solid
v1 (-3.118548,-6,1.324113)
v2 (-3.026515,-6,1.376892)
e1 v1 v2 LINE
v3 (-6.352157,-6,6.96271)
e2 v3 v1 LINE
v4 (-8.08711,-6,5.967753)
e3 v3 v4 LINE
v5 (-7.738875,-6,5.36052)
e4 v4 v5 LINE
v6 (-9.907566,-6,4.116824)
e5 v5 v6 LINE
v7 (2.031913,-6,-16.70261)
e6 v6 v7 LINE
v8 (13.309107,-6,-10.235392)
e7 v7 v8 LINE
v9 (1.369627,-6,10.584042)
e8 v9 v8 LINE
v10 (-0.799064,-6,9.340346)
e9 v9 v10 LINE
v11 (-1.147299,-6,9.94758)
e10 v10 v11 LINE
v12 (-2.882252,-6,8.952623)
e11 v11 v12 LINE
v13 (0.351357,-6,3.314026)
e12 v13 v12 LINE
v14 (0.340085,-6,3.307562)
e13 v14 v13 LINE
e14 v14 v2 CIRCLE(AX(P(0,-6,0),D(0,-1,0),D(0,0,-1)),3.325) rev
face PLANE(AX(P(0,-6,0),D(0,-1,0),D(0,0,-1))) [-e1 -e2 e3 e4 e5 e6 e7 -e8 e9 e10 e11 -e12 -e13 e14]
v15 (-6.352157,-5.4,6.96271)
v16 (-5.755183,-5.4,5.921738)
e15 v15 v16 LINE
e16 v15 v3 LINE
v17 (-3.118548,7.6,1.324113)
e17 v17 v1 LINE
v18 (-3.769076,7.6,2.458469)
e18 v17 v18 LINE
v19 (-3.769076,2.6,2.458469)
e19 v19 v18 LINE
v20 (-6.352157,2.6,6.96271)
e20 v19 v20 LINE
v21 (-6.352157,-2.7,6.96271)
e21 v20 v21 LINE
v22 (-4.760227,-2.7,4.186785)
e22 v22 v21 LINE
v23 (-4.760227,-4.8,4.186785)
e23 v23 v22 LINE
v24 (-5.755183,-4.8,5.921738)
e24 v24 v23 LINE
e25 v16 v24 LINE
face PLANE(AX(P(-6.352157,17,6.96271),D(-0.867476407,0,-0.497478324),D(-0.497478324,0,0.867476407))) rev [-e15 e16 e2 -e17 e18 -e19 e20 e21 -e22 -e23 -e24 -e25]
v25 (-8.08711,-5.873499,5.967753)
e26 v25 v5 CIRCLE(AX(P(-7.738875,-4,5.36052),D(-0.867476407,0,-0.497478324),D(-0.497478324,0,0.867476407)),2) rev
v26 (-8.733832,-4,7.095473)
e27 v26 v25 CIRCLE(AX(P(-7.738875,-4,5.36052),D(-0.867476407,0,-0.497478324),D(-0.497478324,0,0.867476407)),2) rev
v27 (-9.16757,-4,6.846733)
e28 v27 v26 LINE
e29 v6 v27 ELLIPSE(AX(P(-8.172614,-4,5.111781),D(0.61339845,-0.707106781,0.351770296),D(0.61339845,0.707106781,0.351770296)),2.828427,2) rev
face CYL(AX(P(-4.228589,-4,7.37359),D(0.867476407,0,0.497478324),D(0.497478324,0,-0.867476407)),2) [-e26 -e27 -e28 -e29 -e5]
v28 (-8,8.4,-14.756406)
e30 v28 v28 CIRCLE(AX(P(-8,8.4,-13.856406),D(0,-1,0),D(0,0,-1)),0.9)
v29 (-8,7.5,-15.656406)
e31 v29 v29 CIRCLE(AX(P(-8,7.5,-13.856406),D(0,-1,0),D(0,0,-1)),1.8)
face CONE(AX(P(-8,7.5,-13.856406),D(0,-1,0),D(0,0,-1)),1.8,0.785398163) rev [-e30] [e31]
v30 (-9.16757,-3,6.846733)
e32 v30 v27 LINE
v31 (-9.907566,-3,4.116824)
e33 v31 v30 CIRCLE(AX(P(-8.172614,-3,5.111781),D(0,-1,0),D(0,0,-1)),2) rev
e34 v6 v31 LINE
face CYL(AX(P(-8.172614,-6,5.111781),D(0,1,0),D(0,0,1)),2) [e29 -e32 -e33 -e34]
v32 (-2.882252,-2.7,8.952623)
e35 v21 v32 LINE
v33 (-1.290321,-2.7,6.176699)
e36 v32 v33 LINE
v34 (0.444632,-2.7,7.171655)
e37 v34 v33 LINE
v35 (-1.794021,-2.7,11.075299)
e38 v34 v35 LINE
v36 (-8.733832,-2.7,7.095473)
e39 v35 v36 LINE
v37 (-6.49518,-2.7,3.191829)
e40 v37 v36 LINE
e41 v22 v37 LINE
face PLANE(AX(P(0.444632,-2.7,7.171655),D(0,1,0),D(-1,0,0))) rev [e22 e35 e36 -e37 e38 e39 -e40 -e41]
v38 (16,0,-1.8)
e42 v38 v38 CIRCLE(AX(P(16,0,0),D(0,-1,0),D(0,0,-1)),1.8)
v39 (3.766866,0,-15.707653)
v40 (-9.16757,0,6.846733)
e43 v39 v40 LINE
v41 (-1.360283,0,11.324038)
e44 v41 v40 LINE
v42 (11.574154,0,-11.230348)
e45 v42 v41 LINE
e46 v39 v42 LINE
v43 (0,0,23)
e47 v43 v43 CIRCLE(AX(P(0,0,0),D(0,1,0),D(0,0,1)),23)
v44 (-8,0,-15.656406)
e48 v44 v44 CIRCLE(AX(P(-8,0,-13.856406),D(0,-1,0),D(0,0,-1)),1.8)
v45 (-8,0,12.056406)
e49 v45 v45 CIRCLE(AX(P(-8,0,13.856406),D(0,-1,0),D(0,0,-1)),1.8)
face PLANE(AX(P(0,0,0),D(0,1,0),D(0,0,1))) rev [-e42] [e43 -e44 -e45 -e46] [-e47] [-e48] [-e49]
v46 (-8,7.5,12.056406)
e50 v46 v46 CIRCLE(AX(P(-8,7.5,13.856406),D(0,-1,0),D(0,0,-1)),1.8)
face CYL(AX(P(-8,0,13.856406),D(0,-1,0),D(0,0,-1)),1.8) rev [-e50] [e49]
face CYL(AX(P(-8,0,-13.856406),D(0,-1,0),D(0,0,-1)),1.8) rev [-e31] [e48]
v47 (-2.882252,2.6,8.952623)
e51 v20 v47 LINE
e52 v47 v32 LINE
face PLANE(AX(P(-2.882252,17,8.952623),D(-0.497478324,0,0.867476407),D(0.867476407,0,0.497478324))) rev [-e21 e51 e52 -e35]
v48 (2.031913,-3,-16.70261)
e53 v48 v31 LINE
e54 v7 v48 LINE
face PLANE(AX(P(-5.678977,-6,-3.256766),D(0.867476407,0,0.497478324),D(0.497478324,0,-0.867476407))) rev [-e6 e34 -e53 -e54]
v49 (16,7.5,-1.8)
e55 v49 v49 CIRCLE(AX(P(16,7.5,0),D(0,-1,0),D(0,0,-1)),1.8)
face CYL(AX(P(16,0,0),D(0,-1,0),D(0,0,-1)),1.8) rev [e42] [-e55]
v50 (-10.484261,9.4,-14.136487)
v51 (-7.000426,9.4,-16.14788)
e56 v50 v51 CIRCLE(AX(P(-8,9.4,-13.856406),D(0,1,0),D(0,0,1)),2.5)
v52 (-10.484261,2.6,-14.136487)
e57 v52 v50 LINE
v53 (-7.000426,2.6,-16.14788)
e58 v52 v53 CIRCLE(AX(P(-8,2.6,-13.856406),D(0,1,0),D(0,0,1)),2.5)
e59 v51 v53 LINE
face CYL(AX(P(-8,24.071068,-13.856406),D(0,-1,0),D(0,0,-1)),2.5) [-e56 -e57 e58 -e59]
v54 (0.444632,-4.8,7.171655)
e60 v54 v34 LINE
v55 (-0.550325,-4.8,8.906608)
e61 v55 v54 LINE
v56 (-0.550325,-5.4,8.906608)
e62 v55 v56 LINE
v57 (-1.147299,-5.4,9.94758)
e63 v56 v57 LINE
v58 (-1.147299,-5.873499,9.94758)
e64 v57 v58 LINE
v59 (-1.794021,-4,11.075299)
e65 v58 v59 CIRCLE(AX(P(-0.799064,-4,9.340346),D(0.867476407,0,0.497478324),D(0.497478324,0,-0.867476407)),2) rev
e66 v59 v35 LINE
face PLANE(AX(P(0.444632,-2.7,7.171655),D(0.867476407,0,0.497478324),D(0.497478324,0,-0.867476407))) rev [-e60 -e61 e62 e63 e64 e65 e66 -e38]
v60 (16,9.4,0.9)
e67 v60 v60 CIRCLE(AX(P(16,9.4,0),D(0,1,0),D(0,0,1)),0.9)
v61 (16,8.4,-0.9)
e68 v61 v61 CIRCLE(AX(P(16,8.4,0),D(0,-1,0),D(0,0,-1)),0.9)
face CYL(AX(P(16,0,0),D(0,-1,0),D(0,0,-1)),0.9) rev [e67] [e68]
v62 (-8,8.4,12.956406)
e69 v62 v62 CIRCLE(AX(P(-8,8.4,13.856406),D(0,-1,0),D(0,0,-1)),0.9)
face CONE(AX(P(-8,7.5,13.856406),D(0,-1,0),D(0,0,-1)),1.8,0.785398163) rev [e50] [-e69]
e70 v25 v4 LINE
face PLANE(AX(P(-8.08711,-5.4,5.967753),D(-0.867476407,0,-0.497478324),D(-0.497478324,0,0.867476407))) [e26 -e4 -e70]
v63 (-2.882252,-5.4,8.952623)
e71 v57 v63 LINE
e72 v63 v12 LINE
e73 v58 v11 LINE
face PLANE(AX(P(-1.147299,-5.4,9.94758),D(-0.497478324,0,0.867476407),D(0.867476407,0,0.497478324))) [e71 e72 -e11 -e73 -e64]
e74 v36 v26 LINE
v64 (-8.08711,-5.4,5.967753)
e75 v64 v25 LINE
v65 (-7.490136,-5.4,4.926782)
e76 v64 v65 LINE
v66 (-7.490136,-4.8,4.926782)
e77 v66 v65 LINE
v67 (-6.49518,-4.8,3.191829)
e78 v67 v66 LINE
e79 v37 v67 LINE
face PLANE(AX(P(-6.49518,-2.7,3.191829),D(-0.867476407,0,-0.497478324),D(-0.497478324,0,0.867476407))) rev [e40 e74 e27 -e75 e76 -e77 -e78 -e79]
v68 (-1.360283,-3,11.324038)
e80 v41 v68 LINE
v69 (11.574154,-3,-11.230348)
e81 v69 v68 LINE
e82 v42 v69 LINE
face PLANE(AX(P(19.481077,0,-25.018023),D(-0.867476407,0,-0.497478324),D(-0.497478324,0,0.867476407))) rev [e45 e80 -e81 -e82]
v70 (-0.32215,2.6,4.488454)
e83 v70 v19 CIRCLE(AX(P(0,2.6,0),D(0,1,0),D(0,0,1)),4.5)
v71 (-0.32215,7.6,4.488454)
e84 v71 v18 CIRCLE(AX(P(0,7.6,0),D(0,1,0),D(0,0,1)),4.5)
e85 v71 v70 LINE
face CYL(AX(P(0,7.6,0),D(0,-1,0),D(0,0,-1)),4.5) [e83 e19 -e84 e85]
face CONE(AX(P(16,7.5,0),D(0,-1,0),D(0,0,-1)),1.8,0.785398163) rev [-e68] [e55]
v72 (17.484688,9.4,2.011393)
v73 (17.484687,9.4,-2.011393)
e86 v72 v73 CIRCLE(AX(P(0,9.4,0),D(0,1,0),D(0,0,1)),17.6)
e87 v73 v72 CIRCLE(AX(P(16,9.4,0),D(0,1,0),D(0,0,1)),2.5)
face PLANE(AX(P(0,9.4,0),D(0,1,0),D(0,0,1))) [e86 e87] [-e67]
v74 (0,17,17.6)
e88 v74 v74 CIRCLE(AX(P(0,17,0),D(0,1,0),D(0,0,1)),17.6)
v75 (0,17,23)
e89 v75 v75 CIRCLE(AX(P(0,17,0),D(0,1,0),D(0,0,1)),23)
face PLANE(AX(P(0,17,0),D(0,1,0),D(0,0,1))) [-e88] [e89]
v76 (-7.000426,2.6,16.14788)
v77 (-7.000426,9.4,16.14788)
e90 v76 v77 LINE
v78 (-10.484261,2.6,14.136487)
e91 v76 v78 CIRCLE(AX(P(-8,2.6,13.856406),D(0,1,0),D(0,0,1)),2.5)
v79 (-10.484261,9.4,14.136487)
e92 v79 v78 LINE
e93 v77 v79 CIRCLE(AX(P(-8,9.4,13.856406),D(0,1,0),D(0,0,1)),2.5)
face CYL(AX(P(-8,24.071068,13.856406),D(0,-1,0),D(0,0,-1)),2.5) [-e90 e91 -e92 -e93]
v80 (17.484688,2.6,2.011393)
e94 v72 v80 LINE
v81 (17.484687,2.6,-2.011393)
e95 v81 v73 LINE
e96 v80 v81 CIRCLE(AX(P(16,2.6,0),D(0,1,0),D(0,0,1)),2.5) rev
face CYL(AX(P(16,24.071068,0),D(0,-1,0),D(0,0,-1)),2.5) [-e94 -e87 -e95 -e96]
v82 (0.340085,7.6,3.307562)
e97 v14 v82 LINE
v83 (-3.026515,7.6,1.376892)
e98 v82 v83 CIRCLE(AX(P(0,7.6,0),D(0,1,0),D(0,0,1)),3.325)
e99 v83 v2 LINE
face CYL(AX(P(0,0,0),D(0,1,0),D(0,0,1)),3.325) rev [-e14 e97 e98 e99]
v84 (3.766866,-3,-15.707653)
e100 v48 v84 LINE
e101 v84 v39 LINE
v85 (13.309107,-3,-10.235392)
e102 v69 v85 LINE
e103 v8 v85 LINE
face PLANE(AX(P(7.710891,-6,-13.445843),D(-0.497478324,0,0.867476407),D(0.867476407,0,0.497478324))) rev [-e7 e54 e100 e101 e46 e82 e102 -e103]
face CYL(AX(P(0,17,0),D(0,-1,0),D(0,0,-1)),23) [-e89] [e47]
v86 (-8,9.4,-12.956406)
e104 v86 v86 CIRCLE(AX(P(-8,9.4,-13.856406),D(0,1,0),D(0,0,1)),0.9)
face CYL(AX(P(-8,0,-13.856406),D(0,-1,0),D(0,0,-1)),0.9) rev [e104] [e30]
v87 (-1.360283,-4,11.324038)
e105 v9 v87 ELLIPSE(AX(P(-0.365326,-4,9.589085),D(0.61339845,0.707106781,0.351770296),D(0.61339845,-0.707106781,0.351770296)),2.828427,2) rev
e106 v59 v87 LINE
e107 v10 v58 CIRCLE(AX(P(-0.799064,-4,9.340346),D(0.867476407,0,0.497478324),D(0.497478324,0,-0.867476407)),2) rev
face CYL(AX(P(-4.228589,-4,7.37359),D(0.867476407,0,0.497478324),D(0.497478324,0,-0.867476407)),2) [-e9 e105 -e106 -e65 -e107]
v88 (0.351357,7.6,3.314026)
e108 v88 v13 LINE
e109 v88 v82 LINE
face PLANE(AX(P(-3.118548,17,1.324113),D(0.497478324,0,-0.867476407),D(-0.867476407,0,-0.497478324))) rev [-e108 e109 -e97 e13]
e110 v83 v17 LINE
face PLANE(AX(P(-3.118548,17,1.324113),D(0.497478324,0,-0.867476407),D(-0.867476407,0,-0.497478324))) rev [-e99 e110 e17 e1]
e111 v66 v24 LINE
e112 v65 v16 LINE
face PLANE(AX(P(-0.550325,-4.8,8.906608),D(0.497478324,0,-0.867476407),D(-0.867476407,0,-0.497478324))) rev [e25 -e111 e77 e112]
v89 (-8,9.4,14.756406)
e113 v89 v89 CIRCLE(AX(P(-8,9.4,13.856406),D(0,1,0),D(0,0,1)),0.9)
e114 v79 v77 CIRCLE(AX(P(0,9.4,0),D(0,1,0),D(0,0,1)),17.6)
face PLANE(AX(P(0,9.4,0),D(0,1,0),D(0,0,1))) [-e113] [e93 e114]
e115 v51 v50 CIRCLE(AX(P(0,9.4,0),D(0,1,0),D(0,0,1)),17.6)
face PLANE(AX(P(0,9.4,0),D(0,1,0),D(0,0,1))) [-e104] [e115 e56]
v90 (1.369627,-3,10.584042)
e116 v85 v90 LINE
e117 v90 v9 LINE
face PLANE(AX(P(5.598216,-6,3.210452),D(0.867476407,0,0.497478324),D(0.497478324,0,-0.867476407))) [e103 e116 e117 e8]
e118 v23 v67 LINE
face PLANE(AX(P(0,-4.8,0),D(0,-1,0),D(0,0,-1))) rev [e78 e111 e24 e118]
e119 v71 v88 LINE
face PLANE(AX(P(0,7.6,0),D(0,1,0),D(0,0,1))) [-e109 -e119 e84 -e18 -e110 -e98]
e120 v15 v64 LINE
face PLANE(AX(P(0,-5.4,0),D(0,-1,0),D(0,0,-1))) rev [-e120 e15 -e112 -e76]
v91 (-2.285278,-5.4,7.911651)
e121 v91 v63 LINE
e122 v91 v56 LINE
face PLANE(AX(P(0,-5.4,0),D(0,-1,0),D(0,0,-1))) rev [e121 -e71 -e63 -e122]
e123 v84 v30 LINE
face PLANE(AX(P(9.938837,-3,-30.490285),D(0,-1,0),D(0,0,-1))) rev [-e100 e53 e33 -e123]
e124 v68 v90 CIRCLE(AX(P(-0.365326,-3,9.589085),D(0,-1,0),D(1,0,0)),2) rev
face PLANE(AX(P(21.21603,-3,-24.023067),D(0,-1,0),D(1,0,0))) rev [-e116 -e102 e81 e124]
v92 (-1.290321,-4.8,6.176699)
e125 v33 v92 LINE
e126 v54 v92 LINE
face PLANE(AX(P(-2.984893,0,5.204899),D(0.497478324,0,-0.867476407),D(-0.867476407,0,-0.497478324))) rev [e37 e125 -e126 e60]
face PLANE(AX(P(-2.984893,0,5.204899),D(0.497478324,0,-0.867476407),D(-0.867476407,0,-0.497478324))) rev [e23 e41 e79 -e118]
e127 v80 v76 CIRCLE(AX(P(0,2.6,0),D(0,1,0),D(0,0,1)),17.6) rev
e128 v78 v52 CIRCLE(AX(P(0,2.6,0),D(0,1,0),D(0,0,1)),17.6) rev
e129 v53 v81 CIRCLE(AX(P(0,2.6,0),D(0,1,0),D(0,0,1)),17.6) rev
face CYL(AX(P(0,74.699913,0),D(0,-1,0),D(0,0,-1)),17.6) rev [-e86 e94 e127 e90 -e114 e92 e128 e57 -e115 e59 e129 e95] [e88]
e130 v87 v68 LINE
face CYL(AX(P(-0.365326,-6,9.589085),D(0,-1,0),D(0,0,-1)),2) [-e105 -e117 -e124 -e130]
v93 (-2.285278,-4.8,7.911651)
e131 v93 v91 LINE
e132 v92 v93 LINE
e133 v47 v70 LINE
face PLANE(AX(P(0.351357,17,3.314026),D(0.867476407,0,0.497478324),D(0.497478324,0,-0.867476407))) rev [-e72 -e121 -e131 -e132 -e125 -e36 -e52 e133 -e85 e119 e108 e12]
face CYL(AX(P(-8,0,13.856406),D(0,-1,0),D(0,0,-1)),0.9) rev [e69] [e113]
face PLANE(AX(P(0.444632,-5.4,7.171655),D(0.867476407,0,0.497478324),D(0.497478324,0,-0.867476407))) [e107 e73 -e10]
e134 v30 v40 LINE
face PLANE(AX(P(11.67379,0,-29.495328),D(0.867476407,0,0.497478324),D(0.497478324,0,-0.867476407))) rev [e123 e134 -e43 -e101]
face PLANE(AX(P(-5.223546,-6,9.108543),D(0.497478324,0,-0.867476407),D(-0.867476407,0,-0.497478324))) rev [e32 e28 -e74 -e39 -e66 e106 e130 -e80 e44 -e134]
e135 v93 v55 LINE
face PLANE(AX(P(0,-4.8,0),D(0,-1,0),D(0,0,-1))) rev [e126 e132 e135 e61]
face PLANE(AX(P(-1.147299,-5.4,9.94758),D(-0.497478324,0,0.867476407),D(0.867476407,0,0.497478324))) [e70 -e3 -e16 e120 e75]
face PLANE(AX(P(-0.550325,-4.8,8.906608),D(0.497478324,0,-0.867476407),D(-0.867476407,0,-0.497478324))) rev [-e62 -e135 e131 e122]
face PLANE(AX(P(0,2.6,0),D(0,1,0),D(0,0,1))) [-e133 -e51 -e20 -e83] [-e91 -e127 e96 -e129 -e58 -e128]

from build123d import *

# Parameters (mm, degrees)
SKETCH1_R                                    = 23
BOSS_EXTRUDE1_DEPTH                          = 17
SHELL1_T                                     = -2.6
SKETCH4_R                                    = 4.5
BOSS_EXTRUDE3_DEPTH                          = 5
SKETCH5_R                                    = 3.325
CUT_EXTRUDE2_DEPTH                           = 34.857938508
SKETCH22_R                                   = 20.4
SKETCH22_R_2                                 = 17.6
BOSS_EXTRUDE10_DEPTH                         = 14.4
SKETCH24_R                                   = 2.5
BOSS_EXTRUDE11_DEPTH                         = 6.8
CSK_SLOT_FOR_M1_6_COUNTERSUNK_FLAT_H_2_COUNT = 2
CSK_SLOT_FOR_M1_6_COUNTERSUNK_FLAT_H_2_PITCH = 27.712812921
CSK_SLOT_FOR_M1_6_COUNTERSUNK_FLAT_H_3_COUNT = 2
CSK_SLOT_FOR_M1_6_COUNTERSUNK_FLAT_H_3_PITCH = 27.712812921
BOSS_EXTRUDE12_DEPTH                         = 6
SKETCH29_W                                   = 2
SKETCH29_H                                   = 3
CUT_EXTRUDE5_DEPTH                           = 47.005728796
FILLET2_R                                    = 2
SKETCH30_W                                   = 8
SKETCH30_H                                   = 3.3
CUT_EXTRUDE6_DEPTH                           = 4.5
BOSS_EXTRUDE13_DEPTH                         = 0.6
BOSS_EXTRUDE14_DEPTH                         = 0.6
CUT_EXTRUDE7_START                           = -13.6
CUT_EXTRUDE7_DEPTH                           = 13.6


# Read off the part's stored shape, not the designer's step: Cut-Extrude7
with BuildPart() as part:
    # Sketch1 → Boss-Extrude1 (new body)
    with BuildSketch(Plane(origin=(0, 0, 0), x_dir=(1, 0, 0), z_dir=(0, 1, 0))):
        with Locations(Location((0, 0, 0), (0, 0, 270))):
            Circle(SKETCH1_R)
    extrude(amount=BOSS_EXTRUDE1_DEPTH)

    # Shell1
    shell1_openings = [part.faces().sort_by_distance(p)[0] for p in [
        (0, 17, 0),
    ]]
    offset(amount=SHELL1_T, openings=shell1_openings, kind=Kind.INTERSECTION)

    # Sketch4 → Boss-Extrude3 (add)
    with BuildSketch(Plane(origin=(0, 2.6, 0), x_dir=(1, 0, 0), z_dir=(0, 1, 0))):
        with Locations(Location((0, 0, 0), (0, 0, 270))):
            Circle(SKETCH4_R)
    extrude(amount=BOSS_EXTRUDE3_DEPTH)

    # Sketch5 → Cut-Extrude2 (cut, through all)
    with BuildSketch(Plane(origin=(0, 7.6, 0), x_dir=(1, 0, 0), z_dir=(0, 1, 0))):
        with Locations(Location((0, 0, 0), (0, 0, 270))):
            Circle(SKETCH5_R)
    extrude(amount=-CUT_EXTRUDE2_DEPTH, mode=Mode.SUBTRACT)

    # Sketch22 → Boss-Extrude10 (add)
    with BuildSketch(Plane(origin=(0, 2.6, 0), x_dir=(1, 0, 0), z_dir=(0, 1, 0))):
        Circle(SKETCH22_R)
        with Locations(Location((0, 0, 0), (0, 0, 270))):
            Circle(SKETCH22_R_2, mode=Mode.SUBTRACT)
    extrude(amount=BOSS_EXTRUDE10_DEPTH)

    # Sketch24 → Boss-Extrude11 (add)
    with BuildSketch(Plane(origin=(0, 2.6, 0), x_dir=(1, 0, 0), z_dir=(0, 1, 0))):
        with Locations((-8, 13.856406461)):
            Circle(SKETCH24_R)
        with Locations((16, 0)):
            Circle(SKETCH24_R)
        with Locations((-8, -13.856406461)):
            Circle(SKETCH24_R)
    extrude(amount=BOSS_EXTRUDE11_DEPTH)

    # Sketch26 → CSK SLOT for M1.6 Countersunk Flat Head (revolve, cut)
    with BuildSketch(Plane(origin=(-8, 0, 13.856406461), x_dir=(0, 0, -1), z_dir=(1, 0, 0))):
        Polygon((0, 0), (0, 17), (0.9, 17), (0.9, 8.4), (1.8, 7.5), (1.8, 0), align=None)
    csk_slot_for_m1_6_countersunk_flat_head = revolve(axis=Axis((-8, -6.35, 13.856406461), (0, 1, 0)), mode=Mode.SUBTRACT)

    # CSK SLOT for M1.6 Countersunk Flat H 2: CSK SLOT for M1.6 Countersunk Flat Head ×2
    with Locations(*[(0, 0, -i * CSK_SLOT_FOR_M1_6_COUNTERSUNK_FLAT_H_2_PITCH) for i in range(1, CSK_SLOT_FOR_M1_6_COUNTERSUNK_FLAT_H_2_COUNT)]):
        add(csk_slot_for_m1_6_countersunk_flat_head, mode=Mode.SUBTRACT)

    # CSK SLOT for M1.6 Countersunk Flat H 3: CSK SLOT for M1.6 Countersunk Flat Head ×2
    with Locations(*[Vector(0.8660254037844364, 0, -0.5000000000000041) * (i * CSK_SLOT_FOR_M1_6_COUNTERSUNK_FLAT_H_3_PITCH) for i in range(1, CSK_SLOT_FOR_M1_6_COUNTERSUNK_FLAT_H_3_COUNT)]):
        add(csk_slot_for_m1_6_countersunk_flat_head, mode=Mode.SUBTRACT)

    # Sketch28 → Boss-Extrude12 (add)
    with BuildSketch(Plane.XZ):
        with BuildLine():
            Line((-1.694333823, 2.860919065), (-5.263926338, 9.085385824))
            Line((-5.263926338, 9.085385824), (-10.902522986, 5.851776718))
            Line((-10.902522986, 5.851776718), (2.031913438, -16.702609871))
            Line((2.031913438, -16.702609871), (7.670510085, -13.469000765))
            Line((7.670510085, -13.469000765), (1.613572817, -2.907233696))
            ThreePointArc((1.613572817, -2.907233696), (-2.884359054, -1.654115427), (-1.694333823, 2.860919065))
        make_face()
        with BuildLine():
            Line((0.374670309, 12.31899493), (-5.263926338, 9.085385824))
            Line((-5.263926338, 9.085385824), (-1.694333823, 2.860919065))
            ThreePointArc((-1.694333823, 2.860919065), (1.646506155, 2.888709484), (3.325, 0))
            ThreePointArc((3.325, 0), (2.865375597, -1.686786202), (1.613572817, -2.907233696))
            Line((1.613572817, -2.907233696), (7.670510085, -13.469000765))
            Line((7.670510085, -13.469000765), (13.309106732, -10.23539166))
            Line((13.309106732, -10.23539166), (0.374670309, 12.31899493))
        make_face()
    extrude(amount=BOSS_EXTRUDE12_DEPTH)

    # Sketch29 → Cut-Extrude5 (cut, through all)
    with BuildSketch(Plane(origin=(-5.223545836, 0, 9.108543139), x_dir=(0.8674764072728275, 0, 0.4974783239750529), z_dir=(-0.4974783239750529, 0, 0.8674764072728275))):
        with Locations((-5.546549396, -1.5)):
            Rectangle(SKETCH29_W, SKETCH29_H)
        with Locations((5.453450604, -1.5)):
            Rectangle(SKETCH29_W, SKETCH29_H)
    extrude(amount=-CUT_EXTRUDE5_DEPTH, mode=Mode.SUBTRACT)

    # Fillet2
    fillet2_edges = [part.edges().sort_by_distance(p)[0] for p in [
        (-10.902522986, -4.5, 5.851776718),
        (0.374670309, -4.5, 12.31899493),
        (-5.263926338, -6, 9.085385824),
    ]]
    fillet(fillet2_edges, radius=FILLET2_R)

    # Sketch30 → Cut-Extrude6 (cut)
    with BuildSketch(Plane(origin=(-5.223545836, 0, 9.108543139), x_dir=(0.8674764072728275, 0, 0.4974783239750529), z_dir=(-0.4974783239750529, 0, 0.8674764072728275))):
        with Locations((-0.046549396, -4.35)):
            Rectangle(SKETCH30_W, SKETCH30_H)
    extrude(amount=-CUT_EXTRUDE6_DEPTH, mode=Mode.SUBTRACT)

    # Sketch31 → Boss-Extrude13 (add)
    with BuildSketch(Plane.XZ.offset(6)):
        Polygon((-6.49517951, 3.191828695), (0.444631749, 7.171655287), (-1.147298888, 9.94757979), (-8.087110146, 5.967753198), align=None)
    extrude(amount=-BOSS_EXTRUDE13_DEPTH)

    # Sketch33 → Boss-Extrude14 (add)
    with BuildSketch(Plane(origin=(0, -5.4, 0), x_dir=(1, 0, 0), z_dir=(0, 1, 0))):
        Polygon((-6.49517951, -3.191828695), (0.444631749, -7.171655287), (-0.550324899, -8.906608101), (-7.490136157, -4.92678151), align=None)
    extrude(amount=BOSS_EXTRUDE14_DEPTH)

    # Cut-Extrude7 outline → Cut-Extrude7 (cut)
    with BuildSketch(Plane.XZ.offset(6).offset(CUT_EXTRUDE7_START)):
        with BuildLine():
            Line((-3.118548226, 1.324113199), (-3.026514963, 1.376892218))
            ThreePointArc((-3.026514963, 1.376892218), (-1.654115427, 2.884359054), (0.340085146, 3.307562107))
            Line((0.340085146, 3.307562107), (0.351357403, 3.314026495))
            Line((0.351357403, 3.314026495), (-2.882251703, 8.952623142))
            Line((-2.882251703, 8.952623142), (-6.352157332, 6.962709846))
            Line((-6.352157332, 6.962709846), (-3.118548226, 1.324113199))
        make_face()
    extrude(amount=CUT_EXTRUDE7_DEPTH, mode=Mode.SUBTRACT)


solid = part.part
